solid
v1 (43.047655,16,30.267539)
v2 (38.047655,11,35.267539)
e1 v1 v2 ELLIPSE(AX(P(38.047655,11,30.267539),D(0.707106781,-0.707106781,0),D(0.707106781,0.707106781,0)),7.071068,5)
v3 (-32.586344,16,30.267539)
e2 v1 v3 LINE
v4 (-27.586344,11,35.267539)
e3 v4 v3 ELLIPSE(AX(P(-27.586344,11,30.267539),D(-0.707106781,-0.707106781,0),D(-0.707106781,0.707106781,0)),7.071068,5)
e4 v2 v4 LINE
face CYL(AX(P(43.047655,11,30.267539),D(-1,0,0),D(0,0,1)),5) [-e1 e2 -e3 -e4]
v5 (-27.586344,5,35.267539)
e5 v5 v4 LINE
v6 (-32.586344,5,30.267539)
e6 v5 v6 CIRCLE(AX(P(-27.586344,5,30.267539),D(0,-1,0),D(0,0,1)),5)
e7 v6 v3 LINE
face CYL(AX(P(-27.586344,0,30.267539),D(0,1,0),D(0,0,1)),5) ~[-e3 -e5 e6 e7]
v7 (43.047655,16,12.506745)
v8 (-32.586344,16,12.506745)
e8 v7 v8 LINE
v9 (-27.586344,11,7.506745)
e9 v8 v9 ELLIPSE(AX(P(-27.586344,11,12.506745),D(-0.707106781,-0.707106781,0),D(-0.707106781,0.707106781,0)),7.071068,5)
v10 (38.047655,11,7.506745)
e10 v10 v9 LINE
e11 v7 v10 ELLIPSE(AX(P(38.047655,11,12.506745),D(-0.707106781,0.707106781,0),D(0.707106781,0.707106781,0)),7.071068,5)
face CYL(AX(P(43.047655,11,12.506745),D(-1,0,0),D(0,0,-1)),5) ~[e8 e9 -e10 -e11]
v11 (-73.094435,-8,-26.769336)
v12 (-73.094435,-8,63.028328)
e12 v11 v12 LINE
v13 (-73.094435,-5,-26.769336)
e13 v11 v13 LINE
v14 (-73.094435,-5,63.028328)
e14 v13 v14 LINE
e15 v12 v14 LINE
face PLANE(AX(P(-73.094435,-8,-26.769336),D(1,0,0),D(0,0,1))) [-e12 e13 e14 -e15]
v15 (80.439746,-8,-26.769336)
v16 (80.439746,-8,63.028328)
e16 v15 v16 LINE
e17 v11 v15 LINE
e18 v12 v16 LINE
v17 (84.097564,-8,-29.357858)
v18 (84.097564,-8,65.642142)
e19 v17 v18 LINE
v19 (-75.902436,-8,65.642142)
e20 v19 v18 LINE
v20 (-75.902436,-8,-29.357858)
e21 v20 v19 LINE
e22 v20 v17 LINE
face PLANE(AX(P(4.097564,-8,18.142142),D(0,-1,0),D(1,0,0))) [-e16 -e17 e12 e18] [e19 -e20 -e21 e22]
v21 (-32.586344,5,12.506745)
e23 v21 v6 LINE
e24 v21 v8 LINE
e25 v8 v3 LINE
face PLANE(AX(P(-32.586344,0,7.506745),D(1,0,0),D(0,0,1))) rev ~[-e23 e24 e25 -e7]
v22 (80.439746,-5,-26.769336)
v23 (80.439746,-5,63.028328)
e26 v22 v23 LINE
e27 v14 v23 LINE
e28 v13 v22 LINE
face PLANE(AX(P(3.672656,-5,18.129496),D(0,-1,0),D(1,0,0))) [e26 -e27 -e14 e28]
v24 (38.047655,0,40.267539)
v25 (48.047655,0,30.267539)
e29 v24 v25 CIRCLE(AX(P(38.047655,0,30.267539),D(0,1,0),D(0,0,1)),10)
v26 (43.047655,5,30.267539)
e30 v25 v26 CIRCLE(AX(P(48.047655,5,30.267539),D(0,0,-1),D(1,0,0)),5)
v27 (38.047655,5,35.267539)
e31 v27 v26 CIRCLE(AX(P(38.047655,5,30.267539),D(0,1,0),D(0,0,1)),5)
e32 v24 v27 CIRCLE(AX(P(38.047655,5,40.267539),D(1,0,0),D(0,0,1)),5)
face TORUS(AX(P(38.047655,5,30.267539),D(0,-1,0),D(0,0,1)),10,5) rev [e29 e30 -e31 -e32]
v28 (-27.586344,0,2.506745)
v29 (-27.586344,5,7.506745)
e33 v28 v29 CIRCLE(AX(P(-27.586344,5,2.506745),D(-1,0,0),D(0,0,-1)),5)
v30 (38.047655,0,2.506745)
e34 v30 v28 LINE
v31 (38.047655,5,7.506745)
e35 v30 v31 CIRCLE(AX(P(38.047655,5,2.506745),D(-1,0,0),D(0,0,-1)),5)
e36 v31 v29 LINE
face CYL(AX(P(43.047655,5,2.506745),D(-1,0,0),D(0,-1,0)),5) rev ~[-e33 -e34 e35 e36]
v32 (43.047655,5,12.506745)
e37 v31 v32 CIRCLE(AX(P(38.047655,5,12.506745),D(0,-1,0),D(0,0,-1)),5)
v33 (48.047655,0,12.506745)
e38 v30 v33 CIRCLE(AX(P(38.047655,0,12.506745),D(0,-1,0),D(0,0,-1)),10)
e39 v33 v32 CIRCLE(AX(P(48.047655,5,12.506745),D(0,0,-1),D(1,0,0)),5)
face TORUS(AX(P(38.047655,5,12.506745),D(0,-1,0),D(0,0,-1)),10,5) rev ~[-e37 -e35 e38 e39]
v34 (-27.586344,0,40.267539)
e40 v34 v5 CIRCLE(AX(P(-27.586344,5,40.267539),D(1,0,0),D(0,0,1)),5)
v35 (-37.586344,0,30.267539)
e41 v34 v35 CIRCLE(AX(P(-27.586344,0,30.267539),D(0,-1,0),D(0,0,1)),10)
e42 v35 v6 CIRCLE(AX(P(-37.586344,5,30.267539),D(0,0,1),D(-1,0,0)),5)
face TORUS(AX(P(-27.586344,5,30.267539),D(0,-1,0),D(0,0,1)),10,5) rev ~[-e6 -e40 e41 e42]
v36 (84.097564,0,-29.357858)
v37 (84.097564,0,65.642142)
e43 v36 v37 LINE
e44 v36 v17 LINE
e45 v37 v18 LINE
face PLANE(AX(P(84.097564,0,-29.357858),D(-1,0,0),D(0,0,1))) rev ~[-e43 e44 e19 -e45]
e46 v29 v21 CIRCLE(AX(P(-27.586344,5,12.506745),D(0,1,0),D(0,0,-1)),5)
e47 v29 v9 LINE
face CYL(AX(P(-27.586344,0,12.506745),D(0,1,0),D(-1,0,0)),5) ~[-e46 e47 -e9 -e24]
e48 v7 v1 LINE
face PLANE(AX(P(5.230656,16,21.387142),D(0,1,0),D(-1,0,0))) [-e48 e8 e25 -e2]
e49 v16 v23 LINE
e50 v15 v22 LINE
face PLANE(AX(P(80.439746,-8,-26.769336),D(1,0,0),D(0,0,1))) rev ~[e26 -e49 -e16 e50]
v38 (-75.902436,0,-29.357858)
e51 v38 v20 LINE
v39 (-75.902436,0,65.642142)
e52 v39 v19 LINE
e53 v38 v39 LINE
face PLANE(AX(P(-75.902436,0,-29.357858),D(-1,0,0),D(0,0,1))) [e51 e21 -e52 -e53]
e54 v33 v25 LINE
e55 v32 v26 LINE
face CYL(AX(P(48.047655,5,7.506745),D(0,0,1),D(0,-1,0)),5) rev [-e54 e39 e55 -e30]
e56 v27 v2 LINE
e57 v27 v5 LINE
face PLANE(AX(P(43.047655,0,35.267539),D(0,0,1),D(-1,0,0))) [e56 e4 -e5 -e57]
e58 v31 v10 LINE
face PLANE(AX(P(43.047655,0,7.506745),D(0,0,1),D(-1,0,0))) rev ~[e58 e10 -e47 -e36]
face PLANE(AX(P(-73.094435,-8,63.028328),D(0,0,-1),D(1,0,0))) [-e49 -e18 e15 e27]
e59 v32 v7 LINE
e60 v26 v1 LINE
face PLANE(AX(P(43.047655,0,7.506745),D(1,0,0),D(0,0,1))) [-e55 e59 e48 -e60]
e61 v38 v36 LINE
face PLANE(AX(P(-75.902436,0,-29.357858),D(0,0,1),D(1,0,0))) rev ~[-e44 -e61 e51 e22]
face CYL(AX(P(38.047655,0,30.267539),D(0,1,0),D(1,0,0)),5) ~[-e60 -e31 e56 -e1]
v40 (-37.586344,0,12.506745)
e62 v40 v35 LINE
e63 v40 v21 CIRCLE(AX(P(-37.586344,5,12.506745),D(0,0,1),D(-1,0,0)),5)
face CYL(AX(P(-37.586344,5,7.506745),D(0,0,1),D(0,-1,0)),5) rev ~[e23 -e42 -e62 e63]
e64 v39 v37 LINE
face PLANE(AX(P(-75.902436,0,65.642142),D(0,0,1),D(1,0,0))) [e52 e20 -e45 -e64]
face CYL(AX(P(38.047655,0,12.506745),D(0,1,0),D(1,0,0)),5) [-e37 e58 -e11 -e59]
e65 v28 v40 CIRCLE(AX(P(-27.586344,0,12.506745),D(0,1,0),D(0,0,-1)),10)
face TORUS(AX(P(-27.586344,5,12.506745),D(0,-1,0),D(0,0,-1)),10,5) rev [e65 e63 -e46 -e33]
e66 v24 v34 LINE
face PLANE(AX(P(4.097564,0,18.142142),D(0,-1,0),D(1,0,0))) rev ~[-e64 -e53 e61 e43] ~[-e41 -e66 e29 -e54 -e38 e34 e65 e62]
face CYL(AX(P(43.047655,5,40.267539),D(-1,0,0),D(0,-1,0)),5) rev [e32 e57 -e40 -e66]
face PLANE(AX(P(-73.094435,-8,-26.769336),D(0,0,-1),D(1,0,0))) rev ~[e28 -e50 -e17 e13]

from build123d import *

# Parameters (mm, degrees)
F0_W     = 160
F0_H     = 95
F1_DEPTH = 8
F2_W     = 153.534181416
F2_H     = 89.7976644337
F3_DEPTH = 3
F4_W     = 75.6339989603
F4_H     = 27.7607943863
F5_DEPTH = 16
F6_R     = 5


with BuildPart() as f1:
    # F0 (on Front) → F1 (new body)
    with BuildSketch(Plane.XZ):
        with Locations((4.0975642204, 18.1421419978)):
            Rectangle(F0_W, F0_H)
    extrude(amount=F1_DEPTH)

    # F2 (on face) → F3 (cut)
    with BuildSketch(Plane.XZ.offset(8)):
        with Locations((3.6726556718, 18.1294959038)):
            Rectangle(F2_W, F2_H)
    extrude(amount=-F3_DEPTH, mode=Mode.SUBTRACT)

    # F4 (on face) → F5 (join)
    with BuildSketch(Plane(origin=(0, 0, 0), x_dir=(-1, 0, 0), z_dir=(0, 1, 0))):
        with Locations((-5.2306558937, 21.3871421292)):
            Rectangle(F4_W, F4_H)
    extrude(amount=F5_DEPTH)

    # F6
    f6_edges = [f1.edges().sort_by_distance(p)[0] for p in [
        (-32.586344, 8, 35.267539),
        (43.047655, 8, 35.267539),
        (5.230656, 0, 35.267539),
        (5.230656, 16, 35.267539),
        (43.047655, 8, 7.506745),
        (-32.586344, 8, 7.506745),
        (5.230656, 0, 7.506745),
        (5.230656, 16, 7.506745),
        (-32.586344, 0, 21.387142),
        (43.047655, 0, 21.387142),
    ]]
    fillet(f6_edges, radius=F6_R)


solid = f1.part
